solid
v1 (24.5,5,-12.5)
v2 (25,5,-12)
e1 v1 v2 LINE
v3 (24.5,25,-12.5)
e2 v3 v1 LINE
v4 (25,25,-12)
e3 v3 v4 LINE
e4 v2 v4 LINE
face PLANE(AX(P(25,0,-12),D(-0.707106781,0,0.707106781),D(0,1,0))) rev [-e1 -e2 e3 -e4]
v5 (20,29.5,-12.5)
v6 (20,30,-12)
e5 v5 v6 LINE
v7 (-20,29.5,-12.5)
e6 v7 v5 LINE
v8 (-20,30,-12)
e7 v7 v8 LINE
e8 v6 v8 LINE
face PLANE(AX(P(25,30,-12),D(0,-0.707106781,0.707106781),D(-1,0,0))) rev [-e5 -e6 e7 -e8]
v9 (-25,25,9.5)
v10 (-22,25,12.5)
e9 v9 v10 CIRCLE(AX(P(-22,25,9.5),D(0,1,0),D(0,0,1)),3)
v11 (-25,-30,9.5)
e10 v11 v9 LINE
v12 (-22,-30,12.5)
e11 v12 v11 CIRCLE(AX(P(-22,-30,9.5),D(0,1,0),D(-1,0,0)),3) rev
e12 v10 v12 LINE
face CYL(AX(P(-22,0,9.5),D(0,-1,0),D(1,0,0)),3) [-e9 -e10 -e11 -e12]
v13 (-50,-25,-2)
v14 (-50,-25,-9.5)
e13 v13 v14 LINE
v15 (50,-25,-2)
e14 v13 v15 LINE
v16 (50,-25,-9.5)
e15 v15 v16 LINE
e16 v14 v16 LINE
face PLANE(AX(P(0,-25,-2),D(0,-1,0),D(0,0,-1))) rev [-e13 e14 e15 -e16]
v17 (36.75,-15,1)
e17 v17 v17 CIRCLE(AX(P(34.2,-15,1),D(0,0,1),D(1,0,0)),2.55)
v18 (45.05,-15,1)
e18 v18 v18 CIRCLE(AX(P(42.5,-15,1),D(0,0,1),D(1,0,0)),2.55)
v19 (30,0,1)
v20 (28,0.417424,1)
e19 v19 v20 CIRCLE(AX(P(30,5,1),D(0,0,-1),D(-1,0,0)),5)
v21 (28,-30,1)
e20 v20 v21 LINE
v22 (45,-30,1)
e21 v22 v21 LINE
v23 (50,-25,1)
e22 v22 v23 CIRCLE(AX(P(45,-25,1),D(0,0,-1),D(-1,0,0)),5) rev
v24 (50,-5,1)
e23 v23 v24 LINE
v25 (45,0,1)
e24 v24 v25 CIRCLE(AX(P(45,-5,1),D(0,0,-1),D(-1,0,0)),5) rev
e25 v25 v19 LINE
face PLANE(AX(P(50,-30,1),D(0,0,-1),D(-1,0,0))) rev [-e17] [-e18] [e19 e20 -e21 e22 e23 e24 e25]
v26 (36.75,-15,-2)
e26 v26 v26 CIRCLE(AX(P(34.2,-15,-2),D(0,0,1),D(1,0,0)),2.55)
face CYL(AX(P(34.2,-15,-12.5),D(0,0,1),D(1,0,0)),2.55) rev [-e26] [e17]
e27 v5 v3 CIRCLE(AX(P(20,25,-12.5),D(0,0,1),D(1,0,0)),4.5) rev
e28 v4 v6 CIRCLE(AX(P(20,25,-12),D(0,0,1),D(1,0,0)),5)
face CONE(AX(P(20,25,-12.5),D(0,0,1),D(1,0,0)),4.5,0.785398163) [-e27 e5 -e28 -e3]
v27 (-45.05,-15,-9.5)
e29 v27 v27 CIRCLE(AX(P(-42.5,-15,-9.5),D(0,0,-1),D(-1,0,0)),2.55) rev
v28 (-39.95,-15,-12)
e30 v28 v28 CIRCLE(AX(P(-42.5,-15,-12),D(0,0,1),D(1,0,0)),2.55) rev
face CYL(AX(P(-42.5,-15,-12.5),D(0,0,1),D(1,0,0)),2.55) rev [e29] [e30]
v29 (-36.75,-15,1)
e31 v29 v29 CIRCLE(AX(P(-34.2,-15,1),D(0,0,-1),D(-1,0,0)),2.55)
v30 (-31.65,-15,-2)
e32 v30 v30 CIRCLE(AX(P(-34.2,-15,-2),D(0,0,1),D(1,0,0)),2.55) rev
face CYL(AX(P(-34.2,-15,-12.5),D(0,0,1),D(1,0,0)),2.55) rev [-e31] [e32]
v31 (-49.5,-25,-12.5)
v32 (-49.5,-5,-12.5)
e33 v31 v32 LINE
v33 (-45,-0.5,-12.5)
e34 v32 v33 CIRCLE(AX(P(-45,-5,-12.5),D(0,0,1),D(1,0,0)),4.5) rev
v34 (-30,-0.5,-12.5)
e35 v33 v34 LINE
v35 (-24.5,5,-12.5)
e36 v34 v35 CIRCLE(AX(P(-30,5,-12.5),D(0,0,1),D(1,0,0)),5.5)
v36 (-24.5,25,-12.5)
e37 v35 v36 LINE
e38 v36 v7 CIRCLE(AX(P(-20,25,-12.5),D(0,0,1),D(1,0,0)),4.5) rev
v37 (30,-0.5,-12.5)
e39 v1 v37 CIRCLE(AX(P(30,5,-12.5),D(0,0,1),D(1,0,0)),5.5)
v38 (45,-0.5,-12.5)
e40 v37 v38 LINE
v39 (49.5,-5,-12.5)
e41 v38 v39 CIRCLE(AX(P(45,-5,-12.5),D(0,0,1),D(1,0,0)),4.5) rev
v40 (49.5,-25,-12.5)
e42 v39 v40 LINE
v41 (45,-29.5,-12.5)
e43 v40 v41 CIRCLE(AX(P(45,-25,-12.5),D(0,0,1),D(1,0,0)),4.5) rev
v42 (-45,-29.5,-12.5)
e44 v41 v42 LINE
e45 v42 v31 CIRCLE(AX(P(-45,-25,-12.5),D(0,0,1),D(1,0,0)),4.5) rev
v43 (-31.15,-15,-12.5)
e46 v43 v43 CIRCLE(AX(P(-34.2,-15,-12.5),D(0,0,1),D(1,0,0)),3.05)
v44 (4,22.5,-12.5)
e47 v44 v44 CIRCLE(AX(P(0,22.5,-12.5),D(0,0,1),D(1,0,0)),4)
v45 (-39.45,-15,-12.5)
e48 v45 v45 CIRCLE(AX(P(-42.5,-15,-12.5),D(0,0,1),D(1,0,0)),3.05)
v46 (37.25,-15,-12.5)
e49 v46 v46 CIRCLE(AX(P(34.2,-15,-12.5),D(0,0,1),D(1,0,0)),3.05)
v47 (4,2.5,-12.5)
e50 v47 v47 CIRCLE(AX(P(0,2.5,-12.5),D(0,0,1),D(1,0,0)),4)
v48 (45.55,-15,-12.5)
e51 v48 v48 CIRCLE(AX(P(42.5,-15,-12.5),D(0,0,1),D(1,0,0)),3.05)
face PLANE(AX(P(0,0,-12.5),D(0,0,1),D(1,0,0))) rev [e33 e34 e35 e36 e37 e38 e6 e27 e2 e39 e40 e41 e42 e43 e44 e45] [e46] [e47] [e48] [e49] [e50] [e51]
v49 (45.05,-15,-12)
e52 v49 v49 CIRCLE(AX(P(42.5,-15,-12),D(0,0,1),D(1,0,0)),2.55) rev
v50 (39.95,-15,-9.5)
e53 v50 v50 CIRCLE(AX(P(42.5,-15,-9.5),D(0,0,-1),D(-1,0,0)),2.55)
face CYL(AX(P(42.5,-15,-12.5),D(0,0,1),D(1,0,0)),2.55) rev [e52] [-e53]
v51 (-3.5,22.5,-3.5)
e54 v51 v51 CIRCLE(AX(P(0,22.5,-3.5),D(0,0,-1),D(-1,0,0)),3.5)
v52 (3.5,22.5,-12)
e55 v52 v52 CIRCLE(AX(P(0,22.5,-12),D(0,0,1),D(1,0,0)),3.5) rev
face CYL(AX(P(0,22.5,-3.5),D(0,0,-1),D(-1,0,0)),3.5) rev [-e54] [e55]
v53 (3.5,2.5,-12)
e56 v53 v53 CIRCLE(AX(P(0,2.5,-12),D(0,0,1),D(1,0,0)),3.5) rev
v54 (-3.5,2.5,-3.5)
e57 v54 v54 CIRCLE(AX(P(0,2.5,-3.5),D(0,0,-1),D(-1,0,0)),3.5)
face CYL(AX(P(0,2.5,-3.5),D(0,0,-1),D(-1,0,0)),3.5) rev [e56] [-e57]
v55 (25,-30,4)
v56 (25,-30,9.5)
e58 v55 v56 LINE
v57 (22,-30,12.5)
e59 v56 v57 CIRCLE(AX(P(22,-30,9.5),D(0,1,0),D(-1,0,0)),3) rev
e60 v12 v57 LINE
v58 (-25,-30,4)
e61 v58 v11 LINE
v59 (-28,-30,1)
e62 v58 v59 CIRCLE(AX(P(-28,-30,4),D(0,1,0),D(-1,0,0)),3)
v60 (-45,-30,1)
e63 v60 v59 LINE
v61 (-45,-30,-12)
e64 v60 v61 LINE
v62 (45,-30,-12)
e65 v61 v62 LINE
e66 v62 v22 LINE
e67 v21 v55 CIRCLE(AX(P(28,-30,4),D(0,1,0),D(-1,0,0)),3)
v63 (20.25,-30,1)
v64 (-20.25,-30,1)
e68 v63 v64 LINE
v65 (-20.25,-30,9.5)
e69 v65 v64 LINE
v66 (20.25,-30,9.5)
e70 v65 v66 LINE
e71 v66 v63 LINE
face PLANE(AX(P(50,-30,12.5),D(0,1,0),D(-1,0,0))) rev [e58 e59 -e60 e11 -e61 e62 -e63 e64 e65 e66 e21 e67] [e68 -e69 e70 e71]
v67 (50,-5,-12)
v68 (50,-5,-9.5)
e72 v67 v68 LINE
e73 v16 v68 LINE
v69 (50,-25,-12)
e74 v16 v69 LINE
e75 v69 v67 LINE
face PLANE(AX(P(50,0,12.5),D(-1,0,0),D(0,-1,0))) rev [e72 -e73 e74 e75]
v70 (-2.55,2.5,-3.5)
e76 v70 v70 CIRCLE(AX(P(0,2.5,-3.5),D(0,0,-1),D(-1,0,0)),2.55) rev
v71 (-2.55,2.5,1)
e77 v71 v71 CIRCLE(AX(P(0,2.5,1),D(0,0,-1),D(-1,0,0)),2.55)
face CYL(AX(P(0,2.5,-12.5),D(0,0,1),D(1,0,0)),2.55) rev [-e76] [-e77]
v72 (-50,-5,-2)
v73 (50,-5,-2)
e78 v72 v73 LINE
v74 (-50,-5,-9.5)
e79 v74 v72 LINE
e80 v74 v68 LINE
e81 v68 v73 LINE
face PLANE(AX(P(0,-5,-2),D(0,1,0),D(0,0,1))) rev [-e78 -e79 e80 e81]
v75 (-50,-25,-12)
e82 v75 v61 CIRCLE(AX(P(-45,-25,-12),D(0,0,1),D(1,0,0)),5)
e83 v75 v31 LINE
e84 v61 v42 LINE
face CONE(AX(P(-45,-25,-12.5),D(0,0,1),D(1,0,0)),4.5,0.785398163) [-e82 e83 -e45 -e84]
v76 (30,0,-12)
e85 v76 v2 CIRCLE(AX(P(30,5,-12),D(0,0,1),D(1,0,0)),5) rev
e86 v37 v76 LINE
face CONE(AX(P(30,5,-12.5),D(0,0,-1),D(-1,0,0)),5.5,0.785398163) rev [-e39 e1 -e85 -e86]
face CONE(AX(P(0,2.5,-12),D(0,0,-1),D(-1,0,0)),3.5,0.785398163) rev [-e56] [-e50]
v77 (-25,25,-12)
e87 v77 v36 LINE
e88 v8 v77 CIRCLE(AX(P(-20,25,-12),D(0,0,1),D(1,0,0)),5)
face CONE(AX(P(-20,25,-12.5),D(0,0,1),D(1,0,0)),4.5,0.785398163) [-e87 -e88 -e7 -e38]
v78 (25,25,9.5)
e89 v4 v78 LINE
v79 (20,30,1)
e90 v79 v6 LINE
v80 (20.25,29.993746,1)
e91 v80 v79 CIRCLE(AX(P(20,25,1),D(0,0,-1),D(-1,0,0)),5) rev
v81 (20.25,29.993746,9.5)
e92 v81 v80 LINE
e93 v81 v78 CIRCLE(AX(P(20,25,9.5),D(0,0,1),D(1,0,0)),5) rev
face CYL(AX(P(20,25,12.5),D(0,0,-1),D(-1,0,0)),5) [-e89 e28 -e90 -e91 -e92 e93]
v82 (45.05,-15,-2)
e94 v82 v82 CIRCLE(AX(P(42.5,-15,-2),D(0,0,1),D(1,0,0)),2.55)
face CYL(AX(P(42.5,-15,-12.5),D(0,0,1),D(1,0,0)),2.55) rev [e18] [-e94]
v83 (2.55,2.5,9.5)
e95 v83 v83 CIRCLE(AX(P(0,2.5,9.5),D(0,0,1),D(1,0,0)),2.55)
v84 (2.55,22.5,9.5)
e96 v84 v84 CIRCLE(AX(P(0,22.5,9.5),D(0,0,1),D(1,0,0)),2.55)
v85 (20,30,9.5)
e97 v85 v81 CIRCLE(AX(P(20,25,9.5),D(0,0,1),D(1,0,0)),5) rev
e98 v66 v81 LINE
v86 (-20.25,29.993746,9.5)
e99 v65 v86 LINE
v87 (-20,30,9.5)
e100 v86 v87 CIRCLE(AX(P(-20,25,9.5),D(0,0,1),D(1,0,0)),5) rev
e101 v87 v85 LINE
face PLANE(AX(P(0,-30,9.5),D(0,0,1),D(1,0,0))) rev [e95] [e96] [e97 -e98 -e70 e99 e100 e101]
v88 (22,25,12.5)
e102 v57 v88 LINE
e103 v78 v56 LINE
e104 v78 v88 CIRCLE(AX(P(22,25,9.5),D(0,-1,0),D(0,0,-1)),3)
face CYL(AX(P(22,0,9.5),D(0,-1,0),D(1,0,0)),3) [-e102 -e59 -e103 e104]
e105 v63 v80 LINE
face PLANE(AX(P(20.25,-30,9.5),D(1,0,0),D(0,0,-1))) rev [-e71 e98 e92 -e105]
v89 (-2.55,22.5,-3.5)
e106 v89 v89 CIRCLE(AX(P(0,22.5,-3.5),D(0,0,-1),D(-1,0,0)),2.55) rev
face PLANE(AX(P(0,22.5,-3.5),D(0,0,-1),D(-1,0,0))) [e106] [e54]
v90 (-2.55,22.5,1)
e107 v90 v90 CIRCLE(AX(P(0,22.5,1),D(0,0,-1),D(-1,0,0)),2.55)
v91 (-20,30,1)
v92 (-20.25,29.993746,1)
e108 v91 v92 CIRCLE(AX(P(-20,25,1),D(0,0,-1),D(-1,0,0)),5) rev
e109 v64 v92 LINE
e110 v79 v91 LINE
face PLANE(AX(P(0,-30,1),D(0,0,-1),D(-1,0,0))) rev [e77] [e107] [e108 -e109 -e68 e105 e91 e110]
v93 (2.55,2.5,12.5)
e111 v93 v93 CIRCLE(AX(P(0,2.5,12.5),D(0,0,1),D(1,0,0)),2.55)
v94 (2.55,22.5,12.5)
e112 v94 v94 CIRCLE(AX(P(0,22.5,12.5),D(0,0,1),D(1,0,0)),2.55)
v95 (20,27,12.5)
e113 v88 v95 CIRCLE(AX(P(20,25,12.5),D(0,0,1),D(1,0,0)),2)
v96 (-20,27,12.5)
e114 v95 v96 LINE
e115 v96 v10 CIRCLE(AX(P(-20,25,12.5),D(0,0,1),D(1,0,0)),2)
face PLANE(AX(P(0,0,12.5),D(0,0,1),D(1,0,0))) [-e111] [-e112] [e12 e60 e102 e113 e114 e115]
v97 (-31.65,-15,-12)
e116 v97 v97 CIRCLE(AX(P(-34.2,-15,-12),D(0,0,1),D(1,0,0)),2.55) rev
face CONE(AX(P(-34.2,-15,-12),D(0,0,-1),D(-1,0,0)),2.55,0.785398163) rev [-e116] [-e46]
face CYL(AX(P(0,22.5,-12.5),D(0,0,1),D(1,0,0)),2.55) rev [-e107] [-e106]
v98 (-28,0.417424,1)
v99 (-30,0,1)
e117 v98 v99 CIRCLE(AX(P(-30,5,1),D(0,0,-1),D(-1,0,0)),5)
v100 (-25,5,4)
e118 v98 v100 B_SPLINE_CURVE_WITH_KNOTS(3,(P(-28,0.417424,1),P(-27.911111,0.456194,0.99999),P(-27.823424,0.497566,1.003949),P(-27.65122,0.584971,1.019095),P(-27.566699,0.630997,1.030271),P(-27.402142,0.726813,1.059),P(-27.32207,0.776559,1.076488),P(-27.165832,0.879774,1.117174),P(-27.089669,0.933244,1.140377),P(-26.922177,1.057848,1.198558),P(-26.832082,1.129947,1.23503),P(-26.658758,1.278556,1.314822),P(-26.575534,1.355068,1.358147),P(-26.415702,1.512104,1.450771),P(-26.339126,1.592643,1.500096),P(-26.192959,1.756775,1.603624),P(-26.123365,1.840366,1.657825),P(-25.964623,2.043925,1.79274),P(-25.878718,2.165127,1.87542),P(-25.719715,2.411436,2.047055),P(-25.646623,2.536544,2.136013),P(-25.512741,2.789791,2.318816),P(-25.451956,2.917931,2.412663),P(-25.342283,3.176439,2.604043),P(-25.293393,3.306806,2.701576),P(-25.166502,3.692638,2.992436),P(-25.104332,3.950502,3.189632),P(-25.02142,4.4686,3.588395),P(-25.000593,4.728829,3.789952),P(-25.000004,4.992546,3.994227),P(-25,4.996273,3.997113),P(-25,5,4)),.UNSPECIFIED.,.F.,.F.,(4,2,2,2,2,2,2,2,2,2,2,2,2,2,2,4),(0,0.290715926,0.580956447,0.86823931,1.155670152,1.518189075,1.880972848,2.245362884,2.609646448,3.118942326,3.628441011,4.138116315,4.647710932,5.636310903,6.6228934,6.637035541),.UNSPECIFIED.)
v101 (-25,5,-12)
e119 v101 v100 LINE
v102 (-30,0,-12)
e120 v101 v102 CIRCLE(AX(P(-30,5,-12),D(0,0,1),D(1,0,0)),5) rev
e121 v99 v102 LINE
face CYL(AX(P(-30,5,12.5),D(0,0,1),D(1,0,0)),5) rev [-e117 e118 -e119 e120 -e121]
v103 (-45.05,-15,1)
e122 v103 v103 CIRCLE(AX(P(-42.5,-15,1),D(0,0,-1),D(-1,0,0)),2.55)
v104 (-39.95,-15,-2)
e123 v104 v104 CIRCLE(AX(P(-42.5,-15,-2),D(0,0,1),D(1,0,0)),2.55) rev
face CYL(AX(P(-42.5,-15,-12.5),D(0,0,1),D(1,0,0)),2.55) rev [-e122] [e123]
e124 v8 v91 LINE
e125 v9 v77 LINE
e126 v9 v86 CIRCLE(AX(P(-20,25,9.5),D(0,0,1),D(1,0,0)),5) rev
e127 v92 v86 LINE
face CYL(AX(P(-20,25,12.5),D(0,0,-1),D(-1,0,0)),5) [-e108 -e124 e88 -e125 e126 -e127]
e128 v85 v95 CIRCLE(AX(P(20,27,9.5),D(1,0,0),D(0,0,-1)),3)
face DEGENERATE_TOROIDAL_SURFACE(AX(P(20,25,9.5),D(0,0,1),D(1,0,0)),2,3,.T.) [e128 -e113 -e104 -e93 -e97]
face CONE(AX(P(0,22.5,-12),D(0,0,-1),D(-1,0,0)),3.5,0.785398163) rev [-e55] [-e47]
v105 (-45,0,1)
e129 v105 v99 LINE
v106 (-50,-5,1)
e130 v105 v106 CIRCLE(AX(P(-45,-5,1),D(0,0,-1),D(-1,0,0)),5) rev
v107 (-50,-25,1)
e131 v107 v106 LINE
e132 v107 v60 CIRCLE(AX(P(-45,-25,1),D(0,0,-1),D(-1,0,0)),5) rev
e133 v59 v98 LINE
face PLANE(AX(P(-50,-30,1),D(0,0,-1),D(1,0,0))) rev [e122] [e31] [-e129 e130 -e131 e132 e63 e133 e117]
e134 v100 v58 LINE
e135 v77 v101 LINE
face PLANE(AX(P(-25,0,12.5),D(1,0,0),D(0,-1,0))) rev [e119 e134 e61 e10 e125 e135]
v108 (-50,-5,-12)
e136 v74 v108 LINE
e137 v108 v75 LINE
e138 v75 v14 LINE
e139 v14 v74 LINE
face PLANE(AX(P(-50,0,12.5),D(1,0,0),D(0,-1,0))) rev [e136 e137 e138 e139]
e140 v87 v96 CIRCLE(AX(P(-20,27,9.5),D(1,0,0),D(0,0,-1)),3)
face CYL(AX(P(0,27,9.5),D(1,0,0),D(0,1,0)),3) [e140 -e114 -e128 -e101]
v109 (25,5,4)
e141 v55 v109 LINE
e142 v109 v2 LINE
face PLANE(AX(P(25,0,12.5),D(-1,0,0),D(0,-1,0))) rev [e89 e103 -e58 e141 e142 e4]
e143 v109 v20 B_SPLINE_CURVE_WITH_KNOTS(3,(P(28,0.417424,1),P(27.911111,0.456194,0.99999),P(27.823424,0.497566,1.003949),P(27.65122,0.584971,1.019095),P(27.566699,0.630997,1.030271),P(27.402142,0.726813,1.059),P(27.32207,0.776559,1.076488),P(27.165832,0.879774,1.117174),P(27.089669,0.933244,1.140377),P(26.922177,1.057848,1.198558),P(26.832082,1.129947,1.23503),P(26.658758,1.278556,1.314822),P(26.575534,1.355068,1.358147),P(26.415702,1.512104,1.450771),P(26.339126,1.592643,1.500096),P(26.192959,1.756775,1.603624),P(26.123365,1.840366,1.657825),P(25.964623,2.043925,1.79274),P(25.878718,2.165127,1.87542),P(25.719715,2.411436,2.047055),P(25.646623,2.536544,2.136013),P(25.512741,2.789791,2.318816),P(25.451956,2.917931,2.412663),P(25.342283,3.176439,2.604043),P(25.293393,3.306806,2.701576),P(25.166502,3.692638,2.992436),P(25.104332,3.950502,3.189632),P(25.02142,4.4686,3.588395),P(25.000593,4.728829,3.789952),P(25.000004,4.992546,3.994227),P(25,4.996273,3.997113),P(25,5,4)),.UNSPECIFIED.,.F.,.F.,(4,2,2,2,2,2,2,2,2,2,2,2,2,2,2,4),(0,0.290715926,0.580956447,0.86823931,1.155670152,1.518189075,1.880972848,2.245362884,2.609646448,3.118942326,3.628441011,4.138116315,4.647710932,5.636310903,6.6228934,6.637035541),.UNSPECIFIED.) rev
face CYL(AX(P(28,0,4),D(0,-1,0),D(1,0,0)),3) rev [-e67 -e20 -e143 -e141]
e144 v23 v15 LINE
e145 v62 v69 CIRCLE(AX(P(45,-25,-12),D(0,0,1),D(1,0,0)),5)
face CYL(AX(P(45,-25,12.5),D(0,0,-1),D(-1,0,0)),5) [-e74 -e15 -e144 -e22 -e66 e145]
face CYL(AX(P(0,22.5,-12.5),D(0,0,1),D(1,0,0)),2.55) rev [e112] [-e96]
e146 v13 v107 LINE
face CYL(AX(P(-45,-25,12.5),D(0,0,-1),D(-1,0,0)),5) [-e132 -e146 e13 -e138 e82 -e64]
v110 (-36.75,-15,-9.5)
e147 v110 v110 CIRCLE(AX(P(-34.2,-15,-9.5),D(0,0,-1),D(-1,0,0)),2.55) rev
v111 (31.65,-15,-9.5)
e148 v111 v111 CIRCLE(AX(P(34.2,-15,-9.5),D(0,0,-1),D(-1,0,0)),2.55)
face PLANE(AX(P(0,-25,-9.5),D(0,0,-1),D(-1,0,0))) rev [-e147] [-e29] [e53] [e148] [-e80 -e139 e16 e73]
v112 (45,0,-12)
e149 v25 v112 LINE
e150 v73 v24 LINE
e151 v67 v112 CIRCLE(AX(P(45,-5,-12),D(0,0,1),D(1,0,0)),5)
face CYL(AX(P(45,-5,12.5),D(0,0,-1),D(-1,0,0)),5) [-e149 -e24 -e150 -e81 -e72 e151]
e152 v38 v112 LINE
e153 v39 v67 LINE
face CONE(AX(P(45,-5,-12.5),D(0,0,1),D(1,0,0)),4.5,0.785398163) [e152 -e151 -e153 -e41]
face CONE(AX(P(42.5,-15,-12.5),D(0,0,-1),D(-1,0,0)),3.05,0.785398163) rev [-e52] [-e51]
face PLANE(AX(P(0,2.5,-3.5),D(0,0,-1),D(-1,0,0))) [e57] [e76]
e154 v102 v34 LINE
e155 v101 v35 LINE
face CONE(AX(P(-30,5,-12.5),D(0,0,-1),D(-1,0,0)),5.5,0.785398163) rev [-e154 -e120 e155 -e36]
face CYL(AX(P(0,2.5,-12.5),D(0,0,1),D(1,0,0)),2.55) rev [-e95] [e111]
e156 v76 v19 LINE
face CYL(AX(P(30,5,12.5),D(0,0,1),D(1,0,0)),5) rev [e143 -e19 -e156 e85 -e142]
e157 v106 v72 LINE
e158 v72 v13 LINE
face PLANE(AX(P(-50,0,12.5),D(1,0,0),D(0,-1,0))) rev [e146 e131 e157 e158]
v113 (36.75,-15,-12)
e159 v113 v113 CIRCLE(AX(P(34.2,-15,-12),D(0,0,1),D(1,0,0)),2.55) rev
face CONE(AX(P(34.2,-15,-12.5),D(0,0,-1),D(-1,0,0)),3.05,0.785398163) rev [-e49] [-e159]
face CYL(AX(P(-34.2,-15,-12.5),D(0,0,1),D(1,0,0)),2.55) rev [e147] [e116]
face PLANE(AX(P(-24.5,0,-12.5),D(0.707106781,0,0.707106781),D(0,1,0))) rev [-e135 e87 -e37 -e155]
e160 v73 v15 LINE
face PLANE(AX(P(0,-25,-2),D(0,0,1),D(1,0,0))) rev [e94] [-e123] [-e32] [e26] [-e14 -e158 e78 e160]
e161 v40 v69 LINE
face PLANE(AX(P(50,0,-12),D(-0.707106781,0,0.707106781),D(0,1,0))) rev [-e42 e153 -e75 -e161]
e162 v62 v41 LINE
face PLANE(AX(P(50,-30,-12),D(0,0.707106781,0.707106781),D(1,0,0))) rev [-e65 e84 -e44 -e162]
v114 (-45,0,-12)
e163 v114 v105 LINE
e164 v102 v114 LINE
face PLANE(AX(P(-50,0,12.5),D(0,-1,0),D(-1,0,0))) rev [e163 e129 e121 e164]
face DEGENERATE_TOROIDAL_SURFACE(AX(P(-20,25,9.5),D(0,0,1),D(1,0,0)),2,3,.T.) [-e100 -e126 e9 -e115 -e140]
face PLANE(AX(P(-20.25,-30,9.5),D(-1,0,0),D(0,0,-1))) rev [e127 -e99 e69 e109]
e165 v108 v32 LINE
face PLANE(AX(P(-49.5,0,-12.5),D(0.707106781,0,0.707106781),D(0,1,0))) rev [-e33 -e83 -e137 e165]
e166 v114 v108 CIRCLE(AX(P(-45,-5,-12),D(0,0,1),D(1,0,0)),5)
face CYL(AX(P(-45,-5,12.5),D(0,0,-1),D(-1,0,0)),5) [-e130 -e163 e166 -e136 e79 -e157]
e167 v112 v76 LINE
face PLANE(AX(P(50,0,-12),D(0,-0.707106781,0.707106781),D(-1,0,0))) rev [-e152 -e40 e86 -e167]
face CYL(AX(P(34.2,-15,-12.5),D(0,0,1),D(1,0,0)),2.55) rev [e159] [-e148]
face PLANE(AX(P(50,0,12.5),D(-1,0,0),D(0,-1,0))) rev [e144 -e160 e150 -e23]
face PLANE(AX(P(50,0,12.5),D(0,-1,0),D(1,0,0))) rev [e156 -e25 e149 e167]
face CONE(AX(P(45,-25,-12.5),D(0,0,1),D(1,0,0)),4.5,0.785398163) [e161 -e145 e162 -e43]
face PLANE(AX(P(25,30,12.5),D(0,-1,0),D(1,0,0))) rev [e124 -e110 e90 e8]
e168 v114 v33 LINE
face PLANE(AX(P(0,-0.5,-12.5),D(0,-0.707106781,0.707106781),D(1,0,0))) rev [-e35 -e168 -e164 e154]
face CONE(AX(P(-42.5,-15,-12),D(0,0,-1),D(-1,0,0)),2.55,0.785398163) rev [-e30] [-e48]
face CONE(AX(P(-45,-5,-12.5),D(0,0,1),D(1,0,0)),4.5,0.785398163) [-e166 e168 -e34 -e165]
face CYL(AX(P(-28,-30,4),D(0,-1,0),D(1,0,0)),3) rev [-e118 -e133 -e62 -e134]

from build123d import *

# Parameters (mm, degrees)
BOSS_EXTRUDE1_DEPTH     = 12.5
SKETCH3_W               = 25
SKETCH3_H               = 11.5
CUT_EXTRUDE2_DEPTH      = 60.634302209
CUT_EXTRUDE1_DEPTH      = 60.634302209
CUT_EXTRUDE1_DEPTH_BACK = 60.634302209
SKETCH2_W               = 20.25
SKETCH2_H               = 8.5
SKETCH4_W               = 7.5
SKETCH4_H               = 20
CUT_EXTRUDE3_DEPTH      = 60.634302209
SKETCH8_R               = 2.55
PIN_HOLE_DEPTH          = 64.442887702
SKETCH9_R               = 3.5
COUNTERBORE_DEPTH       = 9
SKETCH7_R               = 2.55
CUT_EXTRUDE5_DEPTH      = 60.851900555
LPATTERN1_COUNT         = 2
LPATTERN1_PITCH         = 8.3
MIRROR2_COPY_1_SKETCH_R = 2.55
MIRROR2_COPY_1_DEPTH    = 60.851900555
FILLET1_R               = 5
CHAMFER1_SIZE           = 0.5
FILLET2_R               = 3


# Some blends are built 0.0001 mm under size
with BuildPart() as part:
    # Sketch1 → Boss-Extrude1 (new, symmetric)
    with BuildSketch(Plane.XY):
        Polygon((25, -30), (0, -30), (0, 30), (25, 30), (25, 0), (50, 0), (50, -30), align=None)
    extrude(amount=BOSS_EXTRUDE1_DEPTH, both=True)

    # Sketch3 → Cut-Extrude2 (cut, through all)
    with BuildSketch(Plane(origin=(0, 0, 0), x_dir=(1, 0, 0), z_dir=(0, 1, 0))):
        with Locations((37.5, -6.75)):
            Rectangle(SKETCH3_W, SKETCH3_H)
    extrude(amount=-CUT_EXTRUDE2_DEPTH, mode=Mode.SUBTRACT)

    # Sketch2 → Cut-Extrude1 (cut, two sides: drawn at the far end of the back side and taken through both)
    with BuildSketch(Plane(origin=(0, 0, 0), x_dir=(1, 0, 0), z_dir=(0, 1, 0)).offset(-CUT_EXTRUDE1_DEPTH_BACK)):
        with Locations((10.125, -5.25)):
            Rectangle(SKETCH2_W, SKETCH2_H)
    extrude(amount=CUT_EXTRUDE1_DEPTH + CUT_EXTRUDE1_DEPTH_BACK, mode=Mode.SUBTRACT)

    # Sketch4 → Cut-Extrude3 (cut, through all)
    with BuildSketch(Plane(origin=(50, 0, 0), x_dir=(0, 0, -1), z_dir=(1, 0, 0))):
        with Locations((5.75, -15)):
            Rectangle(SKETCH4_W, SKETCH4_H)
    extrude(amount=-CUT_EXTRUDE3_DEPTH, mode=Mode.SUBTRACT)

    # Mirror1: part across plane


with BuildPart() as part_1:
    add(part.part)
    add(part.part.mirror(Plane(origin=(0, 0, 0), x_dir=(0, 0, 1), z_dir=(1, 0, 0))))

    # Sketch8 → Pin Hole (cut, through all)
    with BuildSketch(Plane.XY.offset(12.5)):
        with Locations((0, 22.5)):
            Circle(SKETCH8_R)
        with Locations((0, 2.5)):
            Circle(SKETCH8_R)
    extrude(amount=-PIN_HOLE_DEPTH, mode=Mode.SUBTRACT)

    # Sketch9 → Counterbore (cut)
    with BuildSketch(Plane(origin=(0, 0, -12.5), x_dir=(-1, 0, 0), z_dir=(0, 0, -1))):
        with Locations((0, 22.5)):
            Circle(SKETCH9_R)
        with Locations((0, 2.5)):
            Circle(SKETCH9_R)
    extrude(amount=-COUNTERBORE_DEPTH, mode=Mode.SUBTRACT)

    # Sketch7 → Cut-Extrude5 (cut, through all)
    with BuildSketch(Plane.XY.offset(1)):
        with Locations((42.5, -15)):
            Circle(SKETCH7_R)
    cut_extrude5 = extrude(amount=-CUT_EXTRUDE5_DEPTH, mode=Mode.SUBTRACT)

    # LPattern1: Cut-Extrude5 ×2
    with Locations(*[(-i * LPATTERN1_PITCH, 0, 0) for i in range(1, LPATTERN1_COUNT)]):
        add(cut_extrude5, mode=Mode.SUBTRACT)

    # Mirror2: Cut-Extrude5 across plane
    add(cut_extrude5.mirror(Plane(origin=(0, 0, 0), x_dir=(0, 0, 1), z_dir=(1, 0, 0))), mode=Mode.SUBTRACT)

    # Mirror2 copy 1 sketch → Mirror2 copy 1 (cut, through all)
    with BuildSketch(Plane(origin=(8.3, 0, 1), x_dir=(-1, 0, 0), z_dir=(0, 0, 1))):
        with Locations((42.5, 15)):
            Circle(MIRROR2_COPY_1_SKETCH_R)
    extrude(amount=-MIRROR2_COPY_1_DEPTH, mode=Mode.SUBTRACT)

    # Fillet1
    # the kernel refuses this fillet: 5 mm, written as the material it adds along each edge
    with BuildSketch(Plane(origin=(-25, 0, 1), x_dir=(0, 1, 0), z_dir=(0, 0, -1))) as fillet1_piece_1:
        with BuildLine():
            CenterArc((FILLET1_R, -FILLET1_R), FILLET1_R, 90, 90)
            Line((0, -FILLET1_R), (0, 0))
            Line((0, 0), (FILLET1_R, 0))
        make_face()
    extrude(amount=13.5)
    with BuildSketch(Plane(origin=(25, 0, 1), x_dir=(0, 1, 0), z_dir=(0, 0, -1))) as fillet1_piece_2:
        with BuildLine():
            CenterArc((FILLET1_R, FILLET1_R), FILLET1_R, 180, 90)
            Line((0, FILLET1_R), (0, 0))
            Line((0, 0), (FILLET1_R, 0))
        make_face()
    extrude(amount=13.5)
    # the kernel refuses this fillet: 5 mm, written as the material it takes off along each edge
    with BuildSketch(Plane(origin=(25, 30, 25), x_dir=(0, -1, 0), z_dir=(0, 0, -1)), Plane(origin=(-25, 30, 25), x_dir=(1, 0, 0), z_dir=(0, 0, -1))) as fillet1_2_piece_1:
        with BuildLine():
            CenterArc((FILLET1_R, FILLET1_R), FILLET1_R, 180, 90)
            Line((0, FILLET1_R), (0, 0))
            Line((0, 0), (FILLET1_R, 0))
        make_face()
    extrude(amount=50, mode=Mode.SUBTRACT)
    with BuildSketch(Plane(origin=(-50, 0, -25), x_dir=(1, 0, 0), z_dir=(0, 0, 1)), Plane(origin=(50, 0, -25), x_dir=(0, -1, 0), z_dir=(0, 0, 1)), Plane(origin=(50, -30, -25), x_dir=(-1, 0, 0), z_dir=(0, 0, 1))) as fillet1_2_piece_2:
        with BuildLine():
            CenterArc((FILLET1_R, -FILLET1_R), FILLET1_R, 90, 90)
            Line((0, -FILLET1_R), (0, 0))
            Line((0, 0), (FILLET1_R, 0))
        make_face()
    extrude(amount=38.5, mode=Mode.SUBTRACT)
    with BuildSketch(Plane(origin=(-50, -30, -25), x_dir=(1, 0, 0), z_dir=(0, 0, 1))) as fillet1_2_piece_3:
        with BuildLine():
            CenterArc((FILLET1_R, FILLET1_R), FILLET1_R, 180, 90)
            Line((0, FILLET1_R), (0, 0))
            Line((0, 0), (FILLET1_R, 0))
        make_face()
    extrude(amount=38.5, mode=Mode.SUBTRACT)

    # Chamfer1
    chamfer1_edges = [part_1.edges().sort_by_distance(p)[0] for p in [
        (3.5, 22.5, -12.5),
        (3.5, 2.5, -12.5),
        (39.95, -15, -12.5),
        (31.65, -15, -12.5),
        (-39.95, -15, -12.5),
        (-31.65, -15, -12.5),
        (0, -30, -12.5),
        (-50, -15, -12.5),
        (-37.5, 0, -12.5),
        (-25, 15, -12.5),
        (0, 30, -12.5),
        (25, 15, -12.5),
        (37.5, 0, -12.5),
        (50, -15, -12.5),
        (48.535533906, -1.464466094, -12.5),
        (-48.535533906, -1.464466094, -12.5),
        (-23.535533906, 28.535533906, -12.5),
        (23.535533906, 28.535533906, -12.5),
        (48.535533906, -28.535533906, -12.5),
        (-48.535533906, -28.535533906, -12.5),
        (-26.464466094, 1.464466094, -12.5),
        (26.464466094, 1.464466094, -12.5),
    ]]
    chamfer(chamfer1_edges, length=CHAMFER1_SIZE)

    # Fillet2
    fillet2_edges = [part_1.edges().sort_by_distance(p)[0] for p in [
        (0, 30, 12.5),
        (-23.535533906, 28.535533906, 12.5),
        (23.535533906, 28.535533906, 12.5),
        (25, -2.5, 12.5),
        (25, -12.5, 1),
        (-25, -2.5, 12.5),
        (-25, -12.5, 1),
    ]]
    fillet(fillet2_edges, radius=FILLET2_R - 0.0001)  # a hair under: the kernel refuses the full size


solid = part_1.part
